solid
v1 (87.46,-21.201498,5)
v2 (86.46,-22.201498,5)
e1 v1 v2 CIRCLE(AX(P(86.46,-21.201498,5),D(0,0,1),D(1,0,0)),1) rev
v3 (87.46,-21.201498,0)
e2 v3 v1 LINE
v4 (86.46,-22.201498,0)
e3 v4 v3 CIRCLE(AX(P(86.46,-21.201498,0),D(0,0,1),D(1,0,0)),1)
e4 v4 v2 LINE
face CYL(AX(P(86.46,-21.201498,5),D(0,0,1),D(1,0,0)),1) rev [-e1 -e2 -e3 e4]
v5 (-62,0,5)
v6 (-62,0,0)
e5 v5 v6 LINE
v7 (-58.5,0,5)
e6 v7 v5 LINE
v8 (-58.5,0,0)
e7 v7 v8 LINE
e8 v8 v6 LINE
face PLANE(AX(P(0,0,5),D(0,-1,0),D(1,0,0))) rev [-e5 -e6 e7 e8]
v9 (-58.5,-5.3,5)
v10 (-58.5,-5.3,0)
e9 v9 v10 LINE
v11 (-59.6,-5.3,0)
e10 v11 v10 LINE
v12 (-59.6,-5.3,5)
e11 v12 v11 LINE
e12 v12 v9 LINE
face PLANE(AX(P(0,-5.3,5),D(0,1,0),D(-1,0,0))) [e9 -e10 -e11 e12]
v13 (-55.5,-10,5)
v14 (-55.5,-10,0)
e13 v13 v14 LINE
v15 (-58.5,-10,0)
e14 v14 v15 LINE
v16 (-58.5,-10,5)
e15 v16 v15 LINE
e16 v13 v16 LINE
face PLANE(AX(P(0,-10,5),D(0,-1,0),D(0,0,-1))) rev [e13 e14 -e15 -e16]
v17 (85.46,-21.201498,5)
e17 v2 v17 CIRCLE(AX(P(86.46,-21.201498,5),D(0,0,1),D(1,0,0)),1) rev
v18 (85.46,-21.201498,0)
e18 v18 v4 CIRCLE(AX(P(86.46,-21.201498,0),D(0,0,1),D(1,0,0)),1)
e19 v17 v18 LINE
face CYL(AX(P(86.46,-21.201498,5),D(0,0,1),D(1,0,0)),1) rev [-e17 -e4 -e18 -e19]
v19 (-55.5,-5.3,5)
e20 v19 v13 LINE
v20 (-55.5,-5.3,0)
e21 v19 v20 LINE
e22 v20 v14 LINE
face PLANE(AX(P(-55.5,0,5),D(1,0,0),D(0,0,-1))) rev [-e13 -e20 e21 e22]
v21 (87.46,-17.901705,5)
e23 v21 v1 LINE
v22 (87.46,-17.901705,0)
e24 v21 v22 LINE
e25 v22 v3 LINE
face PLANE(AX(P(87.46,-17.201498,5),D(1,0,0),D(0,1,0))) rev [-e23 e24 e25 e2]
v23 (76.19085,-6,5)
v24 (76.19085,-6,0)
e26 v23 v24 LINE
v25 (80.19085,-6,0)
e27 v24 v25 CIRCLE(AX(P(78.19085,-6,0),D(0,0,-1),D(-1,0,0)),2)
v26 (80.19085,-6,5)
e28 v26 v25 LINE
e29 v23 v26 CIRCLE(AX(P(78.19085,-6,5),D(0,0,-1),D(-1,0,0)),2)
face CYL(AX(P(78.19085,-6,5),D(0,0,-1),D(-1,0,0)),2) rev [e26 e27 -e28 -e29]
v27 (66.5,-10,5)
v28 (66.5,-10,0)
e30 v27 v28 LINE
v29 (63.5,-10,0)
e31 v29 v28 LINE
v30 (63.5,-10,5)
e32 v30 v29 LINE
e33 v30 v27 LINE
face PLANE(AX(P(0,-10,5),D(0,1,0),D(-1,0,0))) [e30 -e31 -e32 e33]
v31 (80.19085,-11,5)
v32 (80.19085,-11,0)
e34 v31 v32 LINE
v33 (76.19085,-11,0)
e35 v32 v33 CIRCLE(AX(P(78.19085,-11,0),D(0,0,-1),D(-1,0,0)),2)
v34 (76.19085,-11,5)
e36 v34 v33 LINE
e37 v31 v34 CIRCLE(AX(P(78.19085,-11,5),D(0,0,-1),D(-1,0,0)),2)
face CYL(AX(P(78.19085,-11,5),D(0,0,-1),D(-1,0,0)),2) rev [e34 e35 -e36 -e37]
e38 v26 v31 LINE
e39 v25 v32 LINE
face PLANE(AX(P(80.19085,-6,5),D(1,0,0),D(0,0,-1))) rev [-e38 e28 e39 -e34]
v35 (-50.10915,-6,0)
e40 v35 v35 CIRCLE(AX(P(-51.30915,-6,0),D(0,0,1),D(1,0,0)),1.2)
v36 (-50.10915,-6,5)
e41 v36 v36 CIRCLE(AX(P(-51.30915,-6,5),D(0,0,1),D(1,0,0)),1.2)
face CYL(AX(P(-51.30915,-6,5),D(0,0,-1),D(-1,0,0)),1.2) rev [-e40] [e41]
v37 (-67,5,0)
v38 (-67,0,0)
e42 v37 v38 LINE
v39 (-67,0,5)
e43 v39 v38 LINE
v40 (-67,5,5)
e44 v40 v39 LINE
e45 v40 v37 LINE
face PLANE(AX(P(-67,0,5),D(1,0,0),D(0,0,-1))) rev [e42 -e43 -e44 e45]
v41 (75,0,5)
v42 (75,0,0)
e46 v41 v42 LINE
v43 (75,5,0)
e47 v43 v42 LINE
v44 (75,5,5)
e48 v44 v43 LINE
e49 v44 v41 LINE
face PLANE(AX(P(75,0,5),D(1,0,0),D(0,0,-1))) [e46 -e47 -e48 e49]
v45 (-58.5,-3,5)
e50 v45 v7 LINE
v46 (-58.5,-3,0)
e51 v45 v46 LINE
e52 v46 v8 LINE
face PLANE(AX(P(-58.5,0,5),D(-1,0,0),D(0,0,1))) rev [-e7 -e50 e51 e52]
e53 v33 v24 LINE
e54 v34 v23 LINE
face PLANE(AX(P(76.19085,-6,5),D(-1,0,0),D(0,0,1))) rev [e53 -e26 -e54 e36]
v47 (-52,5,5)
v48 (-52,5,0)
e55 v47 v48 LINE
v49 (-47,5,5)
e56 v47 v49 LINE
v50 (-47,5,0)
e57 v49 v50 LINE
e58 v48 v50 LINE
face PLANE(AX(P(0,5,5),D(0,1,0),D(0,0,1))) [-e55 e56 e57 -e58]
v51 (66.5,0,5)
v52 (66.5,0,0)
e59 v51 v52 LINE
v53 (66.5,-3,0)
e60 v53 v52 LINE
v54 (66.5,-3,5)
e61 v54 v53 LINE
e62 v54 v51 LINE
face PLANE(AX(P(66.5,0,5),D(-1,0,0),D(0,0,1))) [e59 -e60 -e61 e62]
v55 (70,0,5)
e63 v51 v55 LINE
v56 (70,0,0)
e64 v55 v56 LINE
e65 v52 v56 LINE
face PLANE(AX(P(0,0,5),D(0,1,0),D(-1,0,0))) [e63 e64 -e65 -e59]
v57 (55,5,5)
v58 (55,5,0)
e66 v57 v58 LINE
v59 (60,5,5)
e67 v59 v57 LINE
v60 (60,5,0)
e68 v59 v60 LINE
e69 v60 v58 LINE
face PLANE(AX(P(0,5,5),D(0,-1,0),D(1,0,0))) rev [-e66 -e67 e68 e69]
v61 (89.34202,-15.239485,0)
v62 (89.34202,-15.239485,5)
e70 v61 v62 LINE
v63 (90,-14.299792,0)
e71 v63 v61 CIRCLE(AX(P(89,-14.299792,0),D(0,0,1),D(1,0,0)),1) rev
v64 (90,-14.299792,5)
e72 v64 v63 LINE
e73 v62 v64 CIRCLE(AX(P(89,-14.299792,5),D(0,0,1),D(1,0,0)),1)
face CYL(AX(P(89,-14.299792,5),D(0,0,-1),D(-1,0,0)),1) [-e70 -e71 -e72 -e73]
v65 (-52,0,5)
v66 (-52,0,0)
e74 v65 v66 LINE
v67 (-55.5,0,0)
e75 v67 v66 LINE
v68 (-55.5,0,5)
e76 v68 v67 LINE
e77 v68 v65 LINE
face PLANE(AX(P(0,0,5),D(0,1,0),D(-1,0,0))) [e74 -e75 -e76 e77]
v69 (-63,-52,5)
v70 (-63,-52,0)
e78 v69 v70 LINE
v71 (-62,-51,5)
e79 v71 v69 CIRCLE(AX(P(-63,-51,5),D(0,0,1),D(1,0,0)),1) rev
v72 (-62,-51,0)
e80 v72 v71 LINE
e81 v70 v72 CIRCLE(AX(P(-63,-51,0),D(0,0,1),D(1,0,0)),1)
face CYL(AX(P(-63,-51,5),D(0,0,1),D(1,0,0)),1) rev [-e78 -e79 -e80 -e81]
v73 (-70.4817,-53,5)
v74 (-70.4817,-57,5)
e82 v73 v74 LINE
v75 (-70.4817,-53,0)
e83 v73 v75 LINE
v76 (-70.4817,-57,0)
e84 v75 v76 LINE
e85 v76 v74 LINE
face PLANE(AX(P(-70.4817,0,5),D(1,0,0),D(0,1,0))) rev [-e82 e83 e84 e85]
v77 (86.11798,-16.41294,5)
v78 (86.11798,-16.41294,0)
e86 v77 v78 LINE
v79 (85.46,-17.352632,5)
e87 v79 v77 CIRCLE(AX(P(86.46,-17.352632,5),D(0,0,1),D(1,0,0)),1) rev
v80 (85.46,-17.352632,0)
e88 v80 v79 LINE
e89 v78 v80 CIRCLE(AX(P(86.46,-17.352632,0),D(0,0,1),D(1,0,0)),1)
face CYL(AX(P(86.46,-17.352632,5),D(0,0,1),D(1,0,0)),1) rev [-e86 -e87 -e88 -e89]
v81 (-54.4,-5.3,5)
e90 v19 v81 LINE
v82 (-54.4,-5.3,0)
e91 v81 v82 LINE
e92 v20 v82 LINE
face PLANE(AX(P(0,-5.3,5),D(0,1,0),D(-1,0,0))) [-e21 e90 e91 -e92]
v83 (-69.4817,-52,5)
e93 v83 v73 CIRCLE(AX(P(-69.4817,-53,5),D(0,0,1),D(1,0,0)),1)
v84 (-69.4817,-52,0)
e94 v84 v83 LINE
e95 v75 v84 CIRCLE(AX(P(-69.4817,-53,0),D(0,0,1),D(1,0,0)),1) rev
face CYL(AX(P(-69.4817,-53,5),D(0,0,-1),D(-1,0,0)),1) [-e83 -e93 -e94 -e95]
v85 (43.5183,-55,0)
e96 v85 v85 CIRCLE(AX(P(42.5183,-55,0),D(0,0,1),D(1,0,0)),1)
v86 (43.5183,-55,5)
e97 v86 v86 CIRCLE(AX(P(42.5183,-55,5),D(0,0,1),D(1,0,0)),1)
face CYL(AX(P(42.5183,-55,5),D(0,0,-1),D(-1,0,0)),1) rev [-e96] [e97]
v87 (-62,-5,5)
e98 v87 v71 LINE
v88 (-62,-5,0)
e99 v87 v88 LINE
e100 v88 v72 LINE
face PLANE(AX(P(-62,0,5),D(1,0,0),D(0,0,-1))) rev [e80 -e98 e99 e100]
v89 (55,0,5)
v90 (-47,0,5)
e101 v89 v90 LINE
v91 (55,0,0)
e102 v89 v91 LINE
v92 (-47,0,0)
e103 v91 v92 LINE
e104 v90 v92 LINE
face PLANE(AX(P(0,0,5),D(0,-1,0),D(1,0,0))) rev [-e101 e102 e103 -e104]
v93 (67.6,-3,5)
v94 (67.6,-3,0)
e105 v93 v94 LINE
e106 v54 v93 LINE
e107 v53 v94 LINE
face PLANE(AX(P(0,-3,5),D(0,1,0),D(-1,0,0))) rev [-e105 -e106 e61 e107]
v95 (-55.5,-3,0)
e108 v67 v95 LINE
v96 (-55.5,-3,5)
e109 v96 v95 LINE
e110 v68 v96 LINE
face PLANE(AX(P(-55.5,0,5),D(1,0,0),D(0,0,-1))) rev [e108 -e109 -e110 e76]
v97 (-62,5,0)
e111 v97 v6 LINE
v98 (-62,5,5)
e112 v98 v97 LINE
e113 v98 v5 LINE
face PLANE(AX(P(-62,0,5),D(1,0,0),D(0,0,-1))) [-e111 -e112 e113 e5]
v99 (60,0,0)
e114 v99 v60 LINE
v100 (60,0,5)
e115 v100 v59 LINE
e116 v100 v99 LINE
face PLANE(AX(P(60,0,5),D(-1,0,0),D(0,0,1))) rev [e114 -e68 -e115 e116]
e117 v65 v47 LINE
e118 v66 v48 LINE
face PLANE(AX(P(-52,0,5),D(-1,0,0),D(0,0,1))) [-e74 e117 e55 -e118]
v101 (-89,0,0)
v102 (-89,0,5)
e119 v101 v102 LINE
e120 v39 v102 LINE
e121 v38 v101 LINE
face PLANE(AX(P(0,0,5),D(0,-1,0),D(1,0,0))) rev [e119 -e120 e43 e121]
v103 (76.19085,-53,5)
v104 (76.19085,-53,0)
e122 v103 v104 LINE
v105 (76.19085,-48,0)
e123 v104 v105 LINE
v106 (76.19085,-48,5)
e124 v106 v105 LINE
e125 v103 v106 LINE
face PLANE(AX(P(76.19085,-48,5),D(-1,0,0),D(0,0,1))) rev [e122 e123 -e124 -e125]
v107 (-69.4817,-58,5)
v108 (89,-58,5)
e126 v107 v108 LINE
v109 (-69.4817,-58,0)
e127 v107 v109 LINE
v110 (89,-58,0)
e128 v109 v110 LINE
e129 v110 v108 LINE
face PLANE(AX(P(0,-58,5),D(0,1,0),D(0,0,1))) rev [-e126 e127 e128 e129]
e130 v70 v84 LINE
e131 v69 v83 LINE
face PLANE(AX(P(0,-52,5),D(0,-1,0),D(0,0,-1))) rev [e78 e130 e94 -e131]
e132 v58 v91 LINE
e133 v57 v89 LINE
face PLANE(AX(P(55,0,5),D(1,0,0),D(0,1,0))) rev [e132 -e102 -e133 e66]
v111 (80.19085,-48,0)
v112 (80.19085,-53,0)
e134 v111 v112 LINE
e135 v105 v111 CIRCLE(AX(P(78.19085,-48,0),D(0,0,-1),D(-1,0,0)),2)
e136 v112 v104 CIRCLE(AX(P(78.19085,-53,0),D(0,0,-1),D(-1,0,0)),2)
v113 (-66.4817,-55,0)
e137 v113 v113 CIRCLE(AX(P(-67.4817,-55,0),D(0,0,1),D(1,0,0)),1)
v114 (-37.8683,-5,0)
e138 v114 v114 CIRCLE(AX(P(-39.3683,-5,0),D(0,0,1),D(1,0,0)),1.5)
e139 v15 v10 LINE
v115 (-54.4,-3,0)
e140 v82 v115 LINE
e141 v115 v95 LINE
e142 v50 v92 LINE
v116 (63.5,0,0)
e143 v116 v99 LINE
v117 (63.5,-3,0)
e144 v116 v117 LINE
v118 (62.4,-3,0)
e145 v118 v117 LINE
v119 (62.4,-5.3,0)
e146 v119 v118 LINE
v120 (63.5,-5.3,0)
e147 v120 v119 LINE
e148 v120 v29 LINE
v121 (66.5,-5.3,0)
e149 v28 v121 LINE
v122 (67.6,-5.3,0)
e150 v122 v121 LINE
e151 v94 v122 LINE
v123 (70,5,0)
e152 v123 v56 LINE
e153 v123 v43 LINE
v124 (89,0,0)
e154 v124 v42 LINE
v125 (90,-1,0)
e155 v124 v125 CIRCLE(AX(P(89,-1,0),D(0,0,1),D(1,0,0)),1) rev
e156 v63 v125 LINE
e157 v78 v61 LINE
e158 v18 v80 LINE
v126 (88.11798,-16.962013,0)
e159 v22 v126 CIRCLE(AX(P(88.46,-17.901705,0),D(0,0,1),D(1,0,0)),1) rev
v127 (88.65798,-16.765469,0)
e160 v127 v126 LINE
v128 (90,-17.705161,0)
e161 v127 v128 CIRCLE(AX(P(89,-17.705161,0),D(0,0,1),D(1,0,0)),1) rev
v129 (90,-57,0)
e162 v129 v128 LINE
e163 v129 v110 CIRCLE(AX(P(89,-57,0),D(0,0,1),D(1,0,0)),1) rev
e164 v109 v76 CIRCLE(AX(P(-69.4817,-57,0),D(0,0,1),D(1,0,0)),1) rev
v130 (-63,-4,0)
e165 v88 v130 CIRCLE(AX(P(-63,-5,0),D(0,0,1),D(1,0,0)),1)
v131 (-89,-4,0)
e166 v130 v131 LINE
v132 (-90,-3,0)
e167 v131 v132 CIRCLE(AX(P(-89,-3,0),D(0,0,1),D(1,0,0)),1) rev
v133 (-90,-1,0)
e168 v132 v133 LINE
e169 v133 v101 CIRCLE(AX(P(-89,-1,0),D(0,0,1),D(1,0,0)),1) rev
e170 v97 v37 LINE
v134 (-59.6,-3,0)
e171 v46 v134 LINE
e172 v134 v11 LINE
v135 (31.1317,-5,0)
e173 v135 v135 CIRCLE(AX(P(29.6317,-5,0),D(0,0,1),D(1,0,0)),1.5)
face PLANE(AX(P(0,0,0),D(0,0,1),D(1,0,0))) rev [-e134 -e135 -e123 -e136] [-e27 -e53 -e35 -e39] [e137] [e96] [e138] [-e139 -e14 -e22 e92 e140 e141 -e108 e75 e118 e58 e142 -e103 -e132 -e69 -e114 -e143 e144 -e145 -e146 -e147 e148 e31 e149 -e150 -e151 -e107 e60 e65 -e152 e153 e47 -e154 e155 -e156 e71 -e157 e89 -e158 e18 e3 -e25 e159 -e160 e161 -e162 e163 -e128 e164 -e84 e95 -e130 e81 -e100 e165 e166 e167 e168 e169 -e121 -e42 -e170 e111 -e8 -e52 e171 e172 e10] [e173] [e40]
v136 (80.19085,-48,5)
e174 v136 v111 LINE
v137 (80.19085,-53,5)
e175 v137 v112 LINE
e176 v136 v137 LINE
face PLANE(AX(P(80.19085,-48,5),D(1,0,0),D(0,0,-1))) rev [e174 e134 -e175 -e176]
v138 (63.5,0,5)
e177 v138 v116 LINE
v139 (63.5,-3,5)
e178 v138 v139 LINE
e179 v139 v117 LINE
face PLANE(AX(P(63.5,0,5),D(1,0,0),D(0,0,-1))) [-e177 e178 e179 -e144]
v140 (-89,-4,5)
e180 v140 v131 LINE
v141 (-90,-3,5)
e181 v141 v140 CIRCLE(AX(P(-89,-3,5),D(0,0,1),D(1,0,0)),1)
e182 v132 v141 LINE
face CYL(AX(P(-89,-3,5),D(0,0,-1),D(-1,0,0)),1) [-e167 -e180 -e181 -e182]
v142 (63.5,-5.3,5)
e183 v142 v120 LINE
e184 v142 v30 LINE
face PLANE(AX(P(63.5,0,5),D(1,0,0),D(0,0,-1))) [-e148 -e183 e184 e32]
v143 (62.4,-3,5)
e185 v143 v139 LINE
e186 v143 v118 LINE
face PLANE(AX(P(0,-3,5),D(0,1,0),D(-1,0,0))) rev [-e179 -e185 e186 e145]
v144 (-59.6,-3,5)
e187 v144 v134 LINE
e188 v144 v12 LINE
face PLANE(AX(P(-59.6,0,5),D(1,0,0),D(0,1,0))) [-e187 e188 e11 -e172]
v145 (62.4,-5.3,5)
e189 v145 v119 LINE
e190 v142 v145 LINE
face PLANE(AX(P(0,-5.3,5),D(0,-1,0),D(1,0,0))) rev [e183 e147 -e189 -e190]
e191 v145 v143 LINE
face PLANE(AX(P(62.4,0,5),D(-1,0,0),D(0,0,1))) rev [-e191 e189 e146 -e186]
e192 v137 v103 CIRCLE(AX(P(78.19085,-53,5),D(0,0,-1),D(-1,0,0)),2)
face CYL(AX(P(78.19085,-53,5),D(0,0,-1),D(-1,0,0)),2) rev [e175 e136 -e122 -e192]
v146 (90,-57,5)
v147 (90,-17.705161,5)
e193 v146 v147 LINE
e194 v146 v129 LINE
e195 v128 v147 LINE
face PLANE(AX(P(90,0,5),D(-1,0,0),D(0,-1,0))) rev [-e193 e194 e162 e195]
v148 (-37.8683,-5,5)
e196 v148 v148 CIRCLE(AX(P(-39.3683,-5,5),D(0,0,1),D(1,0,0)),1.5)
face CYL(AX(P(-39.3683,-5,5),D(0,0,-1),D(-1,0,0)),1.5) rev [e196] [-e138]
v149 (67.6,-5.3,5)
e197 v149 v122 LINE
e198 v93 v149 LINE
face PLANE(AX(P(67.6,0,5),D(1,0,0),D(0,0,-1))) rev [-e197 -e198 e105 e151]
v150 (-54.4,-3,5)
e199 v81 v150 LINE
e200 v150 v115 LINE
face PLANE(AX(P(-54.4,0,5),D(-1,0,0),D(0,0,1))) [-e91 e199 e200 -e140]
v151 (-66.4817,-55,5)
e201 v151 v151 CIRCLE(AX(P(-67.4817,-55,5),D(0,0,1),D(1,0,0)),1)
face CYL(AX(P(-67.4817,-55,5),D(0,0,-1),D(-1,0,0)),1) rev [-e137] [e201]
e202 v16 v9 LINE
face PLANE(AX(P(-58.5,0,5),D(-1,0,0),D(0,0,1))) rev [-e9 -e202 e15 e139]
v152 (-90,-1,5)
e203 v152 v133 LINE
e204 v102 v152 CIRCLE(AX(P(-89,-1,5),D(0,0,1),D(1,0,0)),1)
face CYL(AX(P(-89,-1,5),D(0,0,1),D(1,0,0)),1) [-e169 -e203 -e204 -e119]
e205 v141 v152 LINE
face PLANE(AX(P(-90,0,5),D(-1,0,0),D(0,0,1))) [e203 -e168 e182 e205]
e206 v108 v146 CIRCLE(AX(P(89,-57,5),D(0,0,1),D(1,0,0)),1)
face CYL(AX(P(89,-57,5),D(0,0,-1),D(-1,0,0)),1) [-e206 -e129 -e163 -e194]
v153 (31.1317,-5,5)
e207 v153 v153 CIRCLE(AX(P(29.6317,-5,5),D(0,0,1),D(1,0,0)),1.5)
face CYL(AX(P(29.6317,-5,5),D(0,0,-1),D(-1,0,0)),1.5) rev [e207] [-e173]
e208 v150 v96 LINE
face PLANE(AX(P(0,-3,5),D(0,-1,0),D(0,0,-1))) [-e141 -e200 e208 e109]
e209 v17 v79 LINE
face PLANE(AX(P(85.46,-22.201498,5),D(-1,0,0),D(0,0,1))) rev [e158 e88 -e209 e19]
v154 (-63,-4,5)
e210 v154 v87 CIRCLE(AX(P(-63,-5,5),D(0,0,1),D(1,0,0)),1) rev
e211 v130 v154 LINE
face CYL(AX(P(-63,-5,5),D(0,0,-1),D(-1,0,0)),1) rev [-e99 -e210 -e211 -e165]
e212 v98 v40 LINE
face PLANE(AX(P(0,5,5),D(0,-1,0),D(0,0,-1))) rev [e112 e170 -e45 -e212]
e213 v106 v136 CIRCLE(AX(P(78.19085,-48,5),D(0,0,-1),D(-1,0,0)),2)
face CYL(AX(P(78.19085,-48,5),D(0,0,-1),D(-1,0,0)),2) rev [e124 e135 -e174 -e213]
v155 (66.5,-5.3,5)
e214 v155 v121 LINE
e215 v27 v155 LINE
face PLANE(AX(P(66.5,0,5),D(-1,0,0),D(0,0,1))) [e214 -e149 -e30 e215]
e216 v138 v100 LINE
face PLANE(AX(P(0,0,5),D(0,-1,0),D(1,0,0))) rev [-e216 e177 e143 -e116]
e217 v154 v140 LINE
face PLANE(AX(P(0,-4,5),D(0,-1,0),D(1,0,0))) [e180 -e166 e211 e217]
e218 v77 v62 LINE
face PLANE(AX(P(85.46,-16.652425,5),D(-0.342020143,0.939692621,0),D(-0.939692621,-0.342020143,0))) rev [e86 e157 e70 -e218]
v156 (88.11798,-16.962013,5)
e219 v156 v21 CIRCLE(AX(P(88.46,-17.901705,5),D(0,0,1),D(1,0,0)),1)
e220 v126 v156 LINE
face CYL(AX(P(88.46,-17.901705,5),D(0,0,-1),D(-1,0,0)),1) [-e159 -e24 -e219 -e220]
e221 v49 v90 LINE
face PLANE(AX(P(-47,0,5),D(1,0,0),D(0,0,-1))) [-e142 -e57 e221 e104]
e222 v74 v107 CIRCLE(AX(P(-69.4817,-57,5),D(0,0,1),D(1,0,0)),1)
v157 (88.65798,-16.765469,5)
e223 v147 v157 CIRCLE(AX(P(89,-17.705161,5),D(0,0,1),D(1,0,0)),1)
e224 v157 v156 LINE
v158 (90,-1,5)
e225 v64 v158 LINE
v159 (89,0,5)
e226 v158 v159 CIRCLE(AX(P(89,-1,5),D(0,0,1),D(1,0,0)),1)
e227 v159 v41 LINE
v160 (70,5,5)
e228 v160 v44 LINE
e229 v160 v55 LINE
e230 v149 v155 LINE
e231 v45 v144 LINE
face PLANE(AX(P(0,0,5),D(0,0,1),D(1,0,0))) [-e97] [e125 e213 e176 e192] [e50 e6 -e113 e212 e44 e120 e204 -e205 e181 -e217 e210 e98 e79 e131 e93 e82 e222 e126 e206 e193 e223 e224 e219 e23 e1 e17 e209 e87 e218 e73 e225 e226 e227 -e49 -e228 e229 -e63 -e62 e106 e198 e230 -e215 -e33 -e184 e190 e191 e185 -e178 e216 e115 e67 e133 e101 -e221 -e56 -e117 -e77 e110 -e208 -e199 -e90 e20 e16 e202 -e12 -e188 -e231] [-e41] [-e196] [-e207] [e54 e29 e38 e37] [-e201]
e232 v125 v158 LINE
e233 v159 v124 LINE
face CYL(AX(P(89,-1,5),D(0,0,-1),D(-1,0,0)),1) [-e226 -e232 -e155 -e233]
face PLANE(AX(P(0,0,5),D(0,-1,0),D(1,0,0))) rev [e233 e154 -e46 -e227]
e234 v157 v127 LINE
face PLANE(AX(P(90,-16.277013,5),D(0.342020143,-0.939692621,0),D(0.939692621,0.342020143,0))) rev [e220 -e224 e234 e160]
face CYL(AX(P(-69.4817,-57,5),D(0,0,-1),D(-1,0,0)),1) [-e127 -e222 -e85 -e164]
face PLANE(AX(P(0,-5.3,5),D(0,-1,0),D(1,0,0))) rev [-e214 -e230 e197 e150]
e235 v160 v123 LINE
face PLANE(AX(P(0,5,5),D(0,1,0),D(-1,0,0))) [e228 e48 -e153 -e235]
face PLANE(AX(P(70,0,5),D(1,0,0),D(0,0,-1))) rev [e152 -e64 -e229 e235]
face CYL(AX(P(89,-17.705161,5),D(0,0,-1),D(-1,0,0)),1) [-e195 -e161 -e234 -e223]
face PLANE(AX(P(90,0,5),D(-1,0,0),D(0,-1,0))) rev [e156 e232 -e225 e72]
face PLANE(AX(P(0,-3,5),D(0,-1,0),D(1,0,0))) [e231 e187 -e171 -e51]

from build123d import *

# Parameters (mm, degrees)
ESQUISSE1_R             = 1
ESQUISSE1_R_2           = 1.2
ESQUISSE1_R_3           = 1.5
BOSS_EXTRU_1_DEPTH      = 5
ENL_V_MAT_EXTRU_1_DEPTH = 108.186752913
CONG_1_R                = 1


with BuildPart() as part:
    # Esquisse1 → Boss.-Extru.1 (new body)
    with BuildSketch(Plane.XY):
        Polygon((-67, 5), (-67, 0), (-90, 0), (-90, -4), (-62, -4), (-62, -52), (-70.4817, -52), (-70.4817, -58), (-62, -58), (90, -58), (90, 0), (75, 0), (75, 5), (70, 5), (70, 0), (66.5, 0), (66.5, -3), (67.6, -3), (67.6, -5.3), (66.5, -5.3), (66.5, -10), (63.5, -10), (63.5, -5.3), (62.4, -5.3), (62.4, -3), (63.5, -3), (63.5, 0), (60, 0), (60, 5), (55, 5), (55, 0), (-47, 0), (-47, 5), (-52, 5), (-52, 0), (-55.5, 0), (-55.5, -3), (-54.4, -3), (-54.4, -5.3), (-55.5, -5.3), (-55.5, -10), (-58.5, -10), (-58.5, -5.3), (-59.6, -5.3), (-59.6, -3), (-58.5, -3), (-58.5, 0), (-62, 0), (-62, 5), align=None)
        with Locations((-67.4817, -55)):
            Circle(ESQUISSE1_R, mode=Mode.SUBTRACT)
        with Locations((42.5183, -55)):
            Circle(ESQUISSE1_R, mode=Mode.SUBTRACT)
        with Locations((-51.30915, -6)):
            Circle(ESQUISSE1_R_2, mode=Mode.SUBTRACT)
        with Locations((-39.3683, -5)):
            Circle(ESQUISSE1_R_3, mode=Mode.SUBTRACT)
        with Locations((29.6317, -5)):
            Circle(ESQUISSE1_R_3, mode=Mode.SUBTRACT)
        with Locations((78.19085, -6)):
            Circle(ESQUISSE1_R_2, mode=Mode.SUBTRACT)
    extrude(amount=BOSS_EXTRU_1_DEPTH)

    # Esquisse2 → Enlèv. mat.-Extru.1 (cut, through all)
    with BuildSketch(Plane(origin=(0, 0, 0), x_dir=(-1, 0, 0), z_dir=(0, 0, -1))):
        Polygon((-90, -16.277013327), (-87.46, -17.201497722), (-87.46, -22.201497722), (-85.46, -22.201497722), (-85.46, -16.652424864), (-90, -15), align=None)
        with BuildLine():
            Line((-76.19085, -6), (-76.19085, -11))
            ThreePointArc((-76.19085, -11), (-78.19085, -13), (-80.19085, -11))
            Line((-80.19085, -11), (-80.19085, -6))
            ThreePointArc((-80.19085, -6), (-78.19085, -4), (-76.19085, -6))
        make_face()
        with BuildLine():
            Line((-76.19085, -48), (-76.19085, -53))
            ThreePointArc((-76.19085, -53), (-78.19085, -55), (-80.19085, -53))
            Line((-80.19085, -53), (-80.19085, -48))
            ThreePointArc((-80.19085, -48), (-78.19085, -46), (-76.19085, -48))
        make_face()
    extrude(amount=-ENL_V_MAT_EXTRU_1_DEPTH, mode=Mode.SUBTRACT)

    # Congé1
    cong_1_edges = [part.edges().sort_by_distance(p)[0] for p in [
        (85.46, -16.652424864, 2.5),
        (90, -15, 2.5),
        (90, -16.277013327, 2.5),
        (87.46, -17.201497722, 2.5),
        (87.46, -22.201497722, 2.5),
        (85.46, -22.201497722, 2.5),
        (90, -58, 2.5),
        (90, 0, 2.5),
        (-90, 0, 2.5),
        (-90, -4, 2.5),
        (-62, -4, 2.5),
        (-62, -52, 2.5),
        (-70.4817, -58, 2.5),
        (-70.4817, -52, 2.5),
    ]]
    fillet(cong_1_edges, radius=CONG_1_R - 0.0001)  # a hair under: the kernel refuses the full size


solid = part.part
